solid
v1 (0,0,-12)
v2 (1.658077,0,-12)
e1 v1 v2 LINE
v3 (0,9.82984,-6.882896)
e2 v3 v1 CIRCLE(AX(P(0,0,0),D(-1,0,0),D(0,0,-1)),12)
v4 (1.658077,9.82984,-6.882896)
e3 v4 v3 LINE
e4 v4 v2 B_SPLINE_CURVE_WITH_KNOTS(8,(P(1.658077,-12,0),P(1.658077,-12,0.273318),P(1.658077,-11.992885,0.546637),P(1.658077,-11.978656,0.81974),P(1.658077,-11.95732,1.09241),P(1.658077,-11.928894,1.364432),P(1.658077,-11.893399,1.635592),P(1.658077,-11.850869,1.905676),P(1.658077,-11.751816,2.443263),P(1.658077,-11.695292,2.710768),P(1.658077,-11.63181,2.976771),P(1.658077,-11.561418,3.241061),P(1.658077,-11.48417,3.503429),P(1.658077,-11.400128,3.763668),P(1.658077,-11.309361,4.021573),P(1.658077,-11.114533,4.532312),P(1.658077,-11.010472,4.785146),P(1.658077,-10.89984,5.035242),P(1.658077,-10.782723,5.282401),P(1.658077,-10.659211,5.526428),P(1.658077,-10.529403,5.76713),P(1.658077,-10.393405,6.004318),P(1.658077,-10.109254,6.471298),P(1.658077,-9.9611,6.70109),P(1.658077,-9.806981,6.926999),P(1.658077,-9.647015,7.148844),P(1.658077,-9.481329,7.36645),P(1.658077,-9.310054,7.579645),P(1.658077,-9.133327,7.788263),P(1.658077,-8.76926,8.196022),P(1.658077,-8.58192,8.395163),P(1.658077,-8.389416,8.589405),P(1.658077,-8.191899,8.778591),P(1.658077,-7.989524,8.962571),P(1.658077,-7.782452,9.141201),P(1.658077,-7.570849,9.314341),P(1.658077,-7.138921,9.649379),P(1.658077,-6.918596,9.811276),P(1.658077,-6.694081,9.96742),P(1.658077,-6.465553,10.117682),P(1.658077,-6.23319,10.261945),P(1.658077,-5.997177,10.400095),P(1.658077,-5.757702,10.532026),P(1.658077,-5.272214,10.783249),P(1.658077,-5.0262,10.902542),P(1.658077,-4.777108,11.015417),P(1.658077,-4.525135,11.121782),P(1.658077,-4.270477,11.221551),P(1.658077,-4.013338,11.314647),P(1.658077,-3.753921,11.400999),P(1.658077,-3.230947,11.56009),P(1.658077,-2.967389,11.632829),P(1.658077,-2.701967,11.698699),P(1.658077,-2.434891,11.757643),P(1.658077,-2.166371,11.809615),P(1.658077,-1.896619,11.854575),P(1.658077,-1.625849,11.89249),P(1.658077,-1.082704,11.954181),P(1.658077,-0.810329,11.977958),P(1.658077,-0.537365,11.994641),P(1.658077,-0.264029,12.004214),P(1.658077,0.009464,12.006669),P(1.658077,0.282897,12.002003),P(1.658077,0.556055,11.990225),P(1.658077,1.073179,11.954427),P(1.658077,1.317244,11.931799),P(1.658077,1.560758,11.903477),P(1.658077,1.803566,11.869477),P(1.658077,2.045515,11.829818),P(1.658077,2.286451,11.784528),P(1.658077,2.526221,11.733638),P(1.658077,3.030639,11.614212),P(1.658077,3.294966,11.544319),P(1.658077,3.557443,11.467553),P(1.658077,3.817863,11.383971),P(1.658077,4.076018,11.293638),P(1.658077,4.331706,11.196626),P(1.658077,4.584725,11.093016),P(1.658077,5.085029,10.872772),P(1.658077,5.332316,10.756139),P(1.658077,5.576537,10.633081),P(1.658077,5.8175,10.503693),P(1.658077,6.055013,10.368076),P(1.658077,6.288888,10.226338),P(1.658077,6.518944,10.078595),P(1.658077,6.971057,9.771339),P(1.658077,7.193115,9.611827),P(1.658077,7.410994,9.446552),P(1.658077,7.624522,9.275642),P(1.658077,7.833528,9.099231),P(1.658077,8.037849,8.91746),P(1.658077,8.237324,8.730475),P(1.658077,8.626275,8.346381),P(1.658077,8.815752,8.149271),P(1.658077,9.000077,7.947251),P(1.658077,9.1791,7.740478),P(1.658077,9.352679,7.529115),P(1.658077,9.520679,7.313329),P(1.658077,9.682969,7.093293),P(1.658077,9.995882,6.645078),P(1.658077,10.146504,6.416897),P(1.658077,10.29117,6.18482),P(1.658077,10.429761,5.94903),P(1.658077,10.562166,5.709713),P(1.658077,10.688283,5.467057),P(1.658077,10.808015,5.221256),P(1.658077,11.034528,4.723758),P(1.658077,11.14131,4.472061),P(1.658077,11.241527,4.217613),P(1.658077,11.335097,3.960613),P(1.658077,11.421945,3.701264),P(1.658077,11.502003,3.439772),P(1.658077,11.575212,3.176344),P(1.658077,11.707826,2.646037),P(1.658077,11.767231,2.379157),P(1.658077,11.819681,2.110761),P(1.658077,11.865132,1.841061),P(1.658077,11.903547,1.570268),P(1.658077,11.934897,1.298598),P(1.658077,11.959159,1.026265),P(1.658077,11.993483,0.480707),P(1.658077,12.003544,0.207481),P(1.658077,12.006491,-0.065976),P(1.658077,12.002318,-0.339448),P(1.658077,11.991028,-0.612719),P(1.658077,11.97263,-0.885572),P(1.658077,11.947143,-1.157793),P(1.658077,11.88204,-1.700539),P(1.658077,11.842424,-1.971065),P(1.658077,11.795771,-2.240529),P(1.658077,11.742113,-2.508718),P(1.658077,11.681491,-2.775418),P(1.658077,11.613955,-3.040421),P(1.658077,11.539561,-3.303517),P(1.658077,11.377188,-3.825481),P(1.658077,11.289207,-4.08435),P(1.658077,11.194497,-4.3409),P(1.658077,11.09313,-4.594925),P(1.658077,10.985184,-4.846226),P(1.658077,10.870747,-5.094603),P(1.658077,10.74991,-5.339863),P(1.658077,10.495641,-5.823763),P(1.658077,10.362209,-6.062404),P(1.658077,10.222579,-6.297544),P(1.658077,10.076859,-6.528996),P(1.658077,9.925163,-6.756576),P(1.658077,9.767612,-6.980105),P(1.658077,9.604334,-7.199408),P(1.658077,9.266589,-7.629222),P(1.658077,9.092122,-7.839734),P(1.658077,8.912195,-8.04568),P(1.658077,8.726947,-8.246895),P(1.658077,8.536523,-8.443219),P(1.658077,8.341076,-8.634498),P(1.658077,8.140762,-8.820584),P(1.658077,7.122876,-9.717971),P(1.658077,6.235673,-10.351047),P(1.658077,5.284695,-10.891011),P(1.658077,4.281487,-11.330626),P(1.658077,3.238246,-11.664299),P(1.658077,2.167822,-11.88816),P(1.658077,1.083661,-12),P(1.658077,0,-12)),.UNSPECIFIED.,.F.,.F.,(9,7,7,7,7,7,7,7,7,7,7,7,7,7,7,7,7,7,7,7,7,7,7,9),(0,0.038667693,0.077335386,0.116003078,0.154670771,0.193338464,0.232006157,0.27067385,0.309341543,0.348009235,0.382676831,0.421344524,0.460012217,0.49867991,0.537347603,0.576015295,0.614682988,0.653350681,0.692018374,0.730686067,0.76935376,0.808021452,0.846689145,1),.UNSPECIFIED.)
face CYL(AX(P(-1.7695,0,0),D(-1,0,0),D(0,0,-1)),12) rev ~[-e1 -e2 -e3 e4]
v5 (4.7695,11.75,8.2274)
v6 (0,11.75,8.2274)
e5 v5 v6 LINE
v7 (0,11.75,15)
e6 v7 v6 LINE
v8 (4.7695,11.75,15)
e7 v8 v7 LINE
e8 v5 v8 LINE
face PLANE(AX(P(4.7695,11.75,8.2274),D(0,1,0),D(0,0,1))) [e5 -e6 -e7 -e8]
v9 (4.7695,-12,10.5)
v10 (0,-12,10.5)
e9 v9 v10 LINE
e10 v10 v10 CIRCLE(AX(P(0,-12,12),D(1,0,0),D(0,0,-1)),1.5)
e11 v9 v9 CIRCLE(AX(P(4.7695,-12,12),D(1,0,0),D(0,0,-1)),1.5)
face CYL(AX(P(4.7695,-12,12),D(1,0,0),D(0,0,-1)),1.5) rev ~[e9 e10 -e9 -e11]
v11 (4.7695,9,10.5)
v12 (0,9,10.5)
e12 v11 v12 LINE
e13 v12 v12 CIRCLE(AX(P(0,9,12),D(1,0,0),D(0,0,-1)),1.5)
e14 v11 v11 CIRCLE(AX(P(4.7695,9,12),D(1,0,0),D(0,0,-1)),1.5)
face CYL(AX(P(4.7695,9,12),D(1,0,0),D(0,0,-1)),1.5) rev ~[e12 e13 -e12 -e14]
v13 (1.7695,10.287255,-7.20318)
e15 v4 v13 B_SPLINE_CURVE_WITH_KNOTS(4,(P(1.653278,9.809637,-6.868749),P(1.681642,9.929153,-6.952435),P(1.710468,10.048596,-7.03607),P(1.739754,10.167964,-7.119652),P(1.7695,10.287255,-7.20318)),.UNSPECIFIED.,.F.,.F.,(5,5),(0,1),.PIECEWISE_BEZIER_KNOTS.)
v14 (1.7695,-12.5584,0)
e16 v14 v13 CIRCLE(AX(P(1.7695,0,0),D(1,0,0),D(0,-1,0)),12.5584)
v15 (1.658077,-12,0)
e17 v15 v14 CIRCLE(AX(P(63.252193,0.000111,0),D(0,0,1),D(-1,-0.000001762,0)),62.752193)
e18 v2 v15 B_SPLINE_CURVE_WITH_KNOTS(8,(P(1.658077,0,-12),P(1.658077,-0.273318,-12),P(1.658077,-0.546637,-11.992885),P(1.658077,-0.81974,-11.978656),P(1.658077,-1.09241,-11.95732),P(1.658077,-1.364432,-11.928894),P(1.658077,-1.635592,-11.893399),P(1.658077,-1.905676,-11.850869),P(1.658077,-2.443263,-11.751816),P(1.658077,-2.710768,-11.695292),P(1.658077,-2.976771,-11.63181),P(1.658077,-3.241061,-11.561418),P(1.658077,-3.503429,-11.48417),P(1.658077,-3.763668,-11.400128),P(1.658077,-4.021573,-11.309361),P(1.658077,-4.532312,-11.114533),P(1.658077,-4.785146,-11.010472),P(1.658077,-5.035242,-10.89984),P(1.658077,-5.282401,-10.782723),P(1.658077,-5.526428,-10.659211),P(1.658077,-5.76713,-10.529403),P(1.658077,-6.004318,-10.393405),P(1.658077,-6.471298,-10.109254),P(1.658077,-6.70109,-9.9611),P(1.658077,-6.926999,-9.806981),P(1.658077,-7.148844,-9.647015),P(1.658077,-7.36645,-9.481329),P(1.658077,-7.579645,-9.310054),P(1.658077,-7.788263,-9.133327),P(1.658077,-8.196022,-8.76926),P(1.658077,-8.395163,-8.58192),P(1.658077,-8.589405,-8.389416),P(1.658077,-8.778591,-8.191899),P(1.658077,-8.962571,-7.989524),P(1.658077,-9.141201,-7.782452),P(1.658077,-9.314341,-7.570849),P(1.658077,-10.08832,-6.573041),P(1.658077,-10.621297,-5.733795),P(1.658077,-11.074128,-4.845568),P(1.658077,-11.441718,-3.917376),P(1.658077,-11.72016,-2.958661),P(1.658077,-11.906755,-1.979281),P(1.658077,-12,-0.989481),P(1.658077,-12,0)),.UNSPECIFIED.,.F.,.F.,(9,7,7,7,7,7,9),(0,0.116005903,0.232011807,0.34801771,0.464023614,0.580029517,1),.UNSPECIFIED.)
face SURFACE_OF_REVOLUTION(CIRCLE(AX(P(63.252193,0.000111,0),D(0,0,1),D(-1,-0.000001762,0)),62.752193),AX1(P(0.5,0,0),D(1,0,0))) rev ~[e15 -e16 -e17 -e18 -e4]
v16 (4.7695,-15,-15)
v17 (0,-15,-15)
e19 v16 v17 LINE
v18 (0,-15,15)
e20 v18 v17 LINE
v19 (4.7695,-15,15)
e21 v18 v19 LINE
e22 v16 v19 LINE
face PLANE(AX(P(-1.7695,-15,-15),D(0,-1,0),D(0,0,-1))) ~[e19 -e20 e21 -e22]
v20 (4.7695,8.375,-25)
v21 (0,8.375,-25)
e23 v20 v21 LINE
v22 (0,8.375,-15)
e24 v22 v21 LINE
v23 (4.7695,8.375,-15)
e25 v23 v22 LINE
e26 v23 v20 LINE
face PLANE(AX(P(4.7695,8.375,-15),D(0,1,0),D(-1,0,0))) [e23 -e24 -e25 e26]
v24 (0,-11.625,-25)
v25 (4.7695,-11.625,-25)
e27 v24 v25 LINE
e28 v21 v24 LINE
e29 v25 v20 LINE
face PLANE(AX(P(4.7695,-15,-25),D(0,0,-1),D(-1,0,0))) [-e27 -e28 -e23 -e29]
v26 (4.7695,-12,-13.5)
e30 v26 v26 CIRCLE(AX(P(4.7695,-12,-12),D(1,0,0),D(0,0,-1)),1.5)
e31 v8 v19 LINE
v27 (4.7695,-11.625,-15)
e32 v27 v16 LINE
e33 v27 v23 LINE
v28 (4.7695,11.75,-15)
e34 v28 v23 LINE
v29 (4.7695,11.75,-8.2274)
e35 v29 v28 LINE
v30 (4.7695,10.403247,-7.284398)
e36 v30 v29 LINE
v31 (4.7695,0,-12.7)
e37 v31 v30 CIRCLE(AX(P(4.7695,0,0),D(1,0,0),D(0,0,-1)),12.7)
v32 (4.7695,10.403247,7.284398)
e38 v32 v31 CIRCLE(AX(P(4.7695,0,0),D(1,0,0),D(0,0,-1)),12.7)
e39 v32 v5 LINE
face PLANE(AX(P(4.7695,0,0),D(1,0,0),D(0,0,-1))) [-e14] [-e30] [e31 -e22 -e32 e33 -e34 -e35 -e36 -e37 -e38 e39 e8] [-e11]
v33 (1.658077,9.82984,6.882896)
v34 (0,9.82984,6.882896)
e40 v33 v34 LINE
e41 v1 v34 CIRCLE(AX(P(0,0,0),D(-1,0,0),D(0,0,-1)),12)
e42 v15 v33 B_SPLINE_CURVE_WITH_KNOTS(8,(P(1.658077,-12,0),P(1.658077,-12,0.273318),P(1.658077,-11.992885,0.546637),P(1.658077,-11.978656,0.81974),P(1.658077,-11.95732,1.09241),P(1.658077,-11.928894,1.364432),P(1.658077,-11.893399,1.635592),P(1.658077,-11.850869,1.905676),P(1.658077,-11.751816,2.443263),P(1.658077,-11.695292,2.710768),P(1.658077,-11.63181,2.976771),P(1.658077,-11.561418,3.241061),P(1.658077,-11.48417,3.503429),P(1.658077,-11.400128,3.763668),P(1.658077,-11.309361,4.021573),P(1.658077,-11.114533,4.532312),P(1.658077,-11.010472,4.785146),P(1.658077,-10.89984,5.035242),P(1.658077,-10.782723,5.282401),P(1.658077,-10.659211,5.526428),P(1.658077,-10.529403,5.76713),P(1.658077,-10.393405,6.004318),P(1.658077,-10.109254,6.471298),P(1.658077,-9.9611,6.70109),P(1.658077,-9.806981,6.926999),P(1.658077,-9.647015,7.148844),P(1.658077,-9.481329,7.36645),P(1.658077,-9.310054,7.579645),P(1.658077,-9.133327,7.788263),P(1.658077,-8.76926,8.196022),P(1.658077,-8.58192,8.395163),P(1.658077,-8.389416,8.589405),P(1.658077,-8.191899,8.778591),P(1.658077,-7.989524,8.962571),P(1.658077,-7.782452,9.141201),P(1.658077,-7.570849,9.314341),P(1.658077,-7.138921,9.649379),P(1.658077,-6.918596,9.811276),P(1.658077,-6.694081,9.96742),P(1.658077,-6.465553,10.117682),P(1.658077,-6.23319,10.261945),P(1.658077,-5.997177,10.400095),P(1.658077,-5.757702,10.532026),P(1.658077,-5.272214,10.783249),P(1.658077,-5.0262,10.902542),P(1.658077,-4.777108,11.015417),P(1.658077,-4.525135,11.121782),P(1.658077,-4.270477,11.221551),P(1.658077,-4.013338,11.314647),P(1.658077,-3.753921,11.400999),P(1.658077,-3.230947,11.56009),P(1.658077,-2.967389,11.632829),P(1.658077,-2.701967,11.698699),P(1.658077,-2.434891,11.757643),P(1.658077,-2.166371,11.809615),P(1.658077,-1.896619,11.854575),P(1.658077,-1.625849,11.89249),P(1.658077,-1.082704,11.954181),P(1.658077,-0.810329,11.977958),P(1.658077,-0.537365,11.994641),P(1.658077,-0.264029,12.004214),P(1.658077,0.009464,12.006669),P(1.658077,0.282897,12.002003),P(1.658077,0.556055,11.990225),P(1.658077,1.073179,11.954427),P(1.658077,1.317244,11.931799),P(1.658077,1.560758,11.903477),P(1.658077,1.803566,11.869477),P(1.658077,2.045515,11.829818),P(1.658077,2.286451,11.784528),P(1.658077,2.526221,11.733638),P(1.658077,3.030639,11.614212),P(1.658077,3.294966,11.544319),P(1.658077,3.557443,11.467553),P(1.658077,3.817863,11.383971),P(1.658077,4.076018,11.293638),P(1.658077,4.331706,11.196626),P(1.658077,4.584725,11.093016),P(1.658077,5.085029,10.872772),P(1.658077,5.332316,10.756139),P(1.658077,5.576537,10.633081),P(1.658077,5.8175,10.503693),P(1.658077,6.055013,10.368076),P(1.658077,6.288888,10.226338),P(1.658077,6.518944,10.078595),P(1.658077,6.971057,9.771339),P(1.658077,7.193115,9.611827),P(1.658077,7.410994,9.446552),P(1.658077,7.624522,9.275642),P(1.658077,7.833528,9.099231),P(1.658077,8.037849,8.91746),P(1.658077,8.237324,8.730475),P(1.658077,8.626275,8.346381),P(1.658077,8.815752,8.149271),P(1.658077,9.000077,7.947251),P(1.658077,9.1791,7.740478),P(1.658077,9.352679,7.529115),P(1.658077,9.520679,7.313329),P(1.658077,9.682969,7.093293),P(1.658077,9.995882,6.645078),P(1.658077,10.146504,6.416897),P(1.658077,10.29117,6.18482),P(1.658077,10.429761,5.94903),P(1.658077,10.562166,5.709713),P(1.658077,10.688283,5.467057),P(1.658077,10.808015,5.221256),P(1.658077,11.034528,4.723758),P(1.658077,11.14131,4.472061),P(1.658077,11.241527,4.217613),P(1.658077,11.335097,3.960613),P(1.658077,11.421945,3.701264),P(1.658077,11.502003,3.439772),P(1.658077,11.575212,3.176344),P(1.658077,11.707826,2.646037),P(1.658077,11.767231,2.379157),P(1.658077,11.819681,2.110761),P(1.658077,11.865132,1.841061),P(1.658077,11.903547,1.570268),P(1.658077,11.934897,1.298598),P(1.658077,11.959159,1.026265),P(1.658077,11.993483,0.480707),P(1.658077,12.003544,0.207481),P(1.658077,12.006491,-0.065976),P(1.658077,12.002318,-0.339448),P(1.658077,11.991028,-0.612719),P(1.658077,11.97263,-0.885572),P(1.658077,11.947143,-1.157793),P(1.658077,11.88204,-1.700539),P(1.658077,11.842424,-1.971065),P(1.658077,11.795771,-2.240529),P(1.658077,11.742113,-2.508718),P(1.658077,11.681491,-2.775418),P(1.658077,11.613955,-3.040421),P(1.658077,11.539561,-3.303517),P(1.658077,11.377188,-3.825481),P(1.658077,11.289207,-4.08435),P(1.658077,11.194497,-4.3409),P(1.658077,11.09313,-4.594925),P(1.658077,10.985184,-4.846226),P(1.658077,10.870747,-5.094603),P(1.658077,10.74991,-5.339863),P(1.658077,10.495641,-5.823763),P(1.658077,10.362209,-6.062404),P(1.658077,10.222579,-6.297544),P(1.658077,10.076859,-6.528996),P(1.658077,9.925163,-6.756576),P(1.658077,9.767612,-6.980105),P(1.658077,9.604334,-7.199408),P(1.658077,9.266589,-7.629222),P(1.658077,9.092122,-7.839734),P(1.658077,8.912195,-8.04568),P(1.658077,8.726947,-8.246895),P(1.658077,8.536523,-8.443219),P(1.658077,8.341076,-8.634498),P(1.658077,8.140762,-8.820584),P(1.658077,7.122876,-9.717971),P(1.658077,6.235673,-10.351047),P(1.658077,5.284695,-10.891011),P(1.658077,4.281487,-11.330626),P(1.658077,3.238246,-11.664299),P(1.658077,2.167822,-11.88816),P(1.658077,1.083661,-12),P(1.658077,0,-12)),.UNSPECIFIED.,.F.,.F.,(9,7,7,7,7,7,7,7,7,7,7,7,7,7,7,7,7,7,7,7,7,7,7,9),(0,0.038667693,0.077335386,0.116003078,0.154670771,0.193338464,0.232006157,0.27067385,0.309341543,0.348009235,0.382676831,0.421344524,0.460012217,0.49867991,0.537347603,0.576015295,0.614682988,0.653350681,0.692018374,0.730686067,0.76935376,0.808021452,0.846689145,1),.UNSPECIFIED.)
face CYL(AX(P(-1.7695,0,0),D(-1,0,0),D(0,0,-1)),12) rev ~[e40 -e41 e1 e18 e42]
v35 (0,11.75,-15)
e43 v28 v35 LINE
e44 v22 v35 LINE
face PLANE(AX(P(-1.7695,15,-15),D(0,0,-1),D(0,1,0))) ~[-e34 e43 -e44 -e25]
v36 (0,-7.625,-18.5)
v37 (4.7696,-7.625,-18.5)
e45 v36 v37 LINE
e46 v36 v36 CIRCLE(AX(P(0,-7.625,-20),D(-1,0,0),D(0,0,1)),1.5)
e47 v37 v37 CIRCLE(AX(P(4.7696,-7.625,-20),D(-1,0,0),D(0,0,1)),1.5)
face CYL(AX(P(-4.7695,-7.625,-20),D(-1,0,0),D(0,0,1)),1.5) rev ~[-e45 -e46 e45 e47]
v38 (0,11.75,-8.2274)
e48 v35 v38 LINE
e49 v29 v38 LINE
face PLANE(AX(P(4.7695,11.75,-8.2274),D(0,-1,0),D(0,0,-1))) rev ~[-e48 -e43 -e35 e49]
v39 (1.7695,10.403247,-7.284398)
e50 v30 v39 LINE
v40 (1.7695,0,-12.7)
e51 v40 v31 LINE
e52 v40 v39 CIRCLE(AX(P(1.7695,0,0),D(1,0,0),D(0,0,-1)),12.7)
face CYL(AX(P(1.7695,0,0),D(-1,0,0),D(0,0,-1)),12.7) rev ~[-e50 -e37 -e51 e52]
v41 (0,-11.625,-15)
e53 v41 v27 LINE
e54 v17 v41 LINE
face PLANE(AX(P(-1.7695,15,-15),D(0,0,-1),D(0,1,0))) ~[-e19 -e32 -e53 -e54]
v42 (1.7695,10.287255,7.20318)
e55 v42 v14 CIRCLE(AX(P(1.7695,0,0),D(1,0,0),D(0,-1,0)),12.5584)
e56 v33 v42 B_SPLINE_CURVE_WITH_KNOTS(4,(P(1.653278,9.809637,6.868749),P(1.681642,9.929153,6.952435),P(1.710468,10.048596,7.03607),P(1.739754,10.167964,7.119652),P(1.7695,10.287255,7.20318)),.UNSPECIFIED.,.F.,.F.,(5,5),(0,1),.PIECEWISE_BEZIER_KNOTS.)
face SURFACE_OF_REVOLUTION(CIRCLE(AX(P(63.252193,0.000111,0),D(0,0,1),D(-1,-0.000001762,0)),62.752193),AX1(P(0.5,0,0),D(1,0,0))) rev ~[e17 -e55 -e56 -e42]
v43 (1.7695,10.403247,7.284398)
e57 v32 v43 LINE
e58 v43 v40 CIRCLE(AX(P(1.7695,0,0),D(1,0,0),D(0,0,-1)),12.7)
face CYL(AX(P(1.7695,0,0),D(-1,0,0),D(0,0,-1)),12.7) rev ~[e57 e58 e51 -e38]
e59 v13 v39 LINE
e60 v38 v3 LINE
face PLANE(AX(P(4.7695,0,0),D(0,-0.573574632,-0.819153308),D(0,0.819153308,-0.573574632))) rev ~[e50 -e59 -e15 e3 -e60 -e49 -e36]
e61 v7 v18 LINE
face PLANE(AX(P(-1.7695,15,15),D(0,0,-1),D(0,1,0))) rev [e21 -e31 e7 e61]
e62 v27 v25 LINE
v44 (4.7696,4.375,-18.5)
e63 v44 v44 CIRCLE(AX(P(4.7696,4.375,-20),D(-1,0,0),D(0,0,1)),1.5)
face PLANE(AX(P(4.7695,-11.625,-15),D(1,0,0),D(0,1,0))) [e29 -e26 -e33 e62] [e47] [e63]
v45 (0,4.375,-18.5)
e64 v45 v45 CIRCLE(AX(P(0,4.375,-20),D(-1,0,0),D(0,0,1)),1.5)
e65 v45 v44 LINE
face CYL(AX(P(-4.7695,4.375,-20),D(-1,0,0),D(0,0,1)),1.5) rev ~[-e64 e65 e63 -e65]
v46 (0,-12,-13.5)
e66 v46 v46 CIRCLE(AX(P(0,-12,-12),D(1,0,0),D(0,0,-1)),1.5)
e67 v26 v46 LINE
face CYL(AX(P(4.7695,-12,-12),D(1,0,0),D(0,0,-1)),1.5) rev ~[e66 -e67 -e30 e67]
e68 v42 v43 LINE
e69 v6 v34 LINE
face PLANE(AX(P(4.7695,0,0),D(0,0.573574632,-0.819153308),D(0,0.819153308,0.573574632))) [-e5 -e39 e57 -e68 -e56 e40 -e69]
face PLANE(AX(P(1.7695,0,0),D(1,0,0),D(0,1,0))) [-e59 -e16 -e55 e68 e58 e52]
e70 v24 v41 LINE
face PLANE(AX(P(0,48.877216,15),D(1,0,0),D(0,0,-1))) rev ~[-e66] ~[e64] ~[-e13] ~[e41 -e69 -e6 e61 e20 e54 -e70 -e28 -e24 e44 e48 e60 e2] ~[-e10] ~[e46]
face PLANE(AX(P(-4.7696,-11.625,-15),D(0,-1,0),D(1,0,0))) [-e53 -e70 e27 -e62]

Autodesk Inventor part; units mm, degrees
ref_plane "YZ Plane" through (0, 0, 0) normal (1, 0, 0) x (0, 1, 0)
ref_plane "XZ Plane" through (0, 0, 0) normal (0, 1, 0) x (-1, 0, 0)
sketch "Sketch1" plane through (0, 0, 0) normal (1, 0, 0) x (0, 1, 0)
  line L0 (-15, 15) -> (15, 15)
  line L1 (15, 15) -> (15, -15)
  line L2 (15, -15) -> (-15, -15)
  line L3 (-15, -15) -> (-15, 15)
  line L4 (-15, 15) -> (15, -15) construction
  line L5 (15, 15) -> (-15, -15) construction
  point P0 (0, 0)
  dimension "d0" = 30
  dimension "d1" = 30
extrude "Extrusion1" add sketch "Sketch1" along normal blind 1.7695
sketch "Sketch2" plane through (1.7695, 0, 0) normal (1, 0, 0) x (0, 0, -1)
  circle A0 centre (0, 0) radius 12
  dimension "d4" = 24
extrude "Extrusion2" cut sketch "Sketch2" against normal up to next
sketch "Sketch3" plane through (0, 0, 0) normal (0, 0, 1) x (1, 0, 0)
  line L0 (1.7695, 15) -> (1.7695, -15) projected
  line L1 (1.7695, 0) -> (1.7695, -12.5584)
  line L2 (0.5, 0) -> (1.7695, 0)
  arc A0 (0.5, 0) -> (1.7695, -12.5584) centre (63.25, 0) ccw
  point P0 (0, 0)
  dimension "d7" = 12.5584
  dimension "d8" = 125.5
revolve "Revolution1" cut sketch "Sketch3" angle 360 about axis through (0.5, 0, 0) along (1, 0, 0)
sketch "Sketch4" plane through (1.7695, 0, 0) normal (1, 0, 0) x (0, 0, -1)
  circle A0 centre (0, 0) radius 12.7
  line L0 (-15, 15) -> (-15, -15) projected
  line L1 (-15, 15) -> (15, 15)
  line L2 (15, 15) -> (15, -15)
  line L3 (15, -15) -> (-15, -15)
  line L4 (-15, -15) -> (-15, 15)
  dimension "d10" = 25.4
extrude "Extrusion3" add sketch "Sketch4" along normal blind 3
ref_plane "Work Plane1" through (0, 0, 0) normal (-1, 0, 0) x (0, 0, 1)
mirror "Mirror1" about plane through (0, 0, 0) normal (-1, 0, 0) of "Extrusion1", "Extrusion2", "Revolution1", "Extrusion3"
sketch "Sketch8" plane through (4.7695, 0, 0) normal (1, 0, 0) x (0, 0, -1)
  circle A0 centre (12, -12) radius 1.5
  line L0 (-15, -15) -> (15, -15) projected
  line L1 (15, -15) -> (15, 15) projected
  circle A1 centre (-12, -12) radius 1.5
  circle A2 centre (-12, 9) radius 1.5
  line L2 (-15, 15) -> (-15, -15) projected
  line L3 (15, 15) -> (-15, 15) projected
  point P0 (0, 0)
  dimension "d30" = 3
  dimension "d31" = 3
  dimension "d32" = 3
  dimension "d33" = 3
  dimension "d34" = 3
  dimension "d35" = 3
  dimension "d36" = 6
extrude "Extrusion7" cut sketch "Sketch8" against normal up to surface (9.5391 mm away) contours A0 | A1 | A2
sketch "Sketch9" plane through (4.7695, 0, 0) normal (1, 0, 0) x (0, 0, -1)
  line L0 (0, 0) -> (-8.2274, 11.75)
  line L1 (-8.2274, 11.75) -> (-15, 11.75)
  line L2 (-15, 15) -> (-15, -15) projected
  line L3 (0, 0) -> (0, 15) construction
  line L4 (-15, 11.75) -> (-15, 15)
  line L5 (15, 15) -> (-15, 15) projected
  line L6 (0, 15) -> (-15, 15)
  line L7 (0, 0) -> (8.2274, 11.75)
  line L8 (8.2274, 11.75) -> (15, 11.75)
  line L9 (15, 15) -> (15, -15)
  line L10 (-15, 15) -> (15, 15)
  dimension "d39" = 35
  dimension "d42" = 3.25
extrude "Extrusion8" cut sketch "Sketch9" against normal up to surface (9.5391 mm away)
sketch "Sketch11" plane through (4.7695, -15, -15) normal (0, 0, -1) x (-1, 0, 0)
  line L0 (9.5391, 0) -> (9.5391, 26.75) projected
  line L1 (0, 0) -> (9.5391, 26.75) construction
  line L2 (0, 26.75) -> (9.5391, 26.75) projected
  line L3 (0, 26.75) -> (9.5391, 0) construction
  line L4 (0, 0) -> (0, 26.75) projected
  line L5 (9.5391, 3.375) -> (0, 3.375)
  line L6 (0, 3.375) -> (0, 23.375)
  line L7 (0, 23.375) -> (9.5391, 23.375)
  line L8 (9.5391, 23.375) -> (9.5391, 3.375)
  line L9 (9.5391, 3.375) -> (0, 23.375) construction
  line L10 (0, 3.375) -> (9.5391, 23.375) construction
  point P0 (4.7695, 15)
  point P1 (4.7695, 13.375)
  dimension "d46" = 20
extrude "Extrusion10" add sketch "Sketch11" along normal blind 10 contours L5 L4 L7 L0
sketch "Sketch12" plane through (-4.7695, -15, -15) normal (-1, 0, 0) x (0, 0, 1)
  circle A0 centre (-5, 19.375) radius 1.5
  circle A1 centre (-5, 7.375) radius 1.5
  line L0 (0, 3.375) -> (-10, 3.375) projected
  line L1 (0, 23.375) -> (-10, 23.375) projected
  point P0 (15, 15)
  dimension "d49" = 4
  dimension "d50" = 5
  dimension "d51" = 4
  dimension "d52" = 5
  dimension "d53" = 3
extrude "Extrusion11" cut sketch "Sketch12" against normal up to surface (9.5391 mm away)
sketch "Sketch13" plane through (4.7695, -15, -15) normal (0, -1, 0) x (1, 0, 0)
  line L0 (-9.5391, 30) -> (0, 30) projected
  line L1 (-4.7695, 30) -> (-4.7695, -10)
  line L2 (0, -10) -> (-9.5391, -10) projected
  point P0 (-4.7695, 15)
split body "Split2" sketch "Sketch13" result one side removed curves L1 removed pieces at (-0.5, -13.971, -0.4809)
equation "\"d37\" = d32"
properties part number "LargeLensHolderP1S1" material "Acetal Resin, Black"
